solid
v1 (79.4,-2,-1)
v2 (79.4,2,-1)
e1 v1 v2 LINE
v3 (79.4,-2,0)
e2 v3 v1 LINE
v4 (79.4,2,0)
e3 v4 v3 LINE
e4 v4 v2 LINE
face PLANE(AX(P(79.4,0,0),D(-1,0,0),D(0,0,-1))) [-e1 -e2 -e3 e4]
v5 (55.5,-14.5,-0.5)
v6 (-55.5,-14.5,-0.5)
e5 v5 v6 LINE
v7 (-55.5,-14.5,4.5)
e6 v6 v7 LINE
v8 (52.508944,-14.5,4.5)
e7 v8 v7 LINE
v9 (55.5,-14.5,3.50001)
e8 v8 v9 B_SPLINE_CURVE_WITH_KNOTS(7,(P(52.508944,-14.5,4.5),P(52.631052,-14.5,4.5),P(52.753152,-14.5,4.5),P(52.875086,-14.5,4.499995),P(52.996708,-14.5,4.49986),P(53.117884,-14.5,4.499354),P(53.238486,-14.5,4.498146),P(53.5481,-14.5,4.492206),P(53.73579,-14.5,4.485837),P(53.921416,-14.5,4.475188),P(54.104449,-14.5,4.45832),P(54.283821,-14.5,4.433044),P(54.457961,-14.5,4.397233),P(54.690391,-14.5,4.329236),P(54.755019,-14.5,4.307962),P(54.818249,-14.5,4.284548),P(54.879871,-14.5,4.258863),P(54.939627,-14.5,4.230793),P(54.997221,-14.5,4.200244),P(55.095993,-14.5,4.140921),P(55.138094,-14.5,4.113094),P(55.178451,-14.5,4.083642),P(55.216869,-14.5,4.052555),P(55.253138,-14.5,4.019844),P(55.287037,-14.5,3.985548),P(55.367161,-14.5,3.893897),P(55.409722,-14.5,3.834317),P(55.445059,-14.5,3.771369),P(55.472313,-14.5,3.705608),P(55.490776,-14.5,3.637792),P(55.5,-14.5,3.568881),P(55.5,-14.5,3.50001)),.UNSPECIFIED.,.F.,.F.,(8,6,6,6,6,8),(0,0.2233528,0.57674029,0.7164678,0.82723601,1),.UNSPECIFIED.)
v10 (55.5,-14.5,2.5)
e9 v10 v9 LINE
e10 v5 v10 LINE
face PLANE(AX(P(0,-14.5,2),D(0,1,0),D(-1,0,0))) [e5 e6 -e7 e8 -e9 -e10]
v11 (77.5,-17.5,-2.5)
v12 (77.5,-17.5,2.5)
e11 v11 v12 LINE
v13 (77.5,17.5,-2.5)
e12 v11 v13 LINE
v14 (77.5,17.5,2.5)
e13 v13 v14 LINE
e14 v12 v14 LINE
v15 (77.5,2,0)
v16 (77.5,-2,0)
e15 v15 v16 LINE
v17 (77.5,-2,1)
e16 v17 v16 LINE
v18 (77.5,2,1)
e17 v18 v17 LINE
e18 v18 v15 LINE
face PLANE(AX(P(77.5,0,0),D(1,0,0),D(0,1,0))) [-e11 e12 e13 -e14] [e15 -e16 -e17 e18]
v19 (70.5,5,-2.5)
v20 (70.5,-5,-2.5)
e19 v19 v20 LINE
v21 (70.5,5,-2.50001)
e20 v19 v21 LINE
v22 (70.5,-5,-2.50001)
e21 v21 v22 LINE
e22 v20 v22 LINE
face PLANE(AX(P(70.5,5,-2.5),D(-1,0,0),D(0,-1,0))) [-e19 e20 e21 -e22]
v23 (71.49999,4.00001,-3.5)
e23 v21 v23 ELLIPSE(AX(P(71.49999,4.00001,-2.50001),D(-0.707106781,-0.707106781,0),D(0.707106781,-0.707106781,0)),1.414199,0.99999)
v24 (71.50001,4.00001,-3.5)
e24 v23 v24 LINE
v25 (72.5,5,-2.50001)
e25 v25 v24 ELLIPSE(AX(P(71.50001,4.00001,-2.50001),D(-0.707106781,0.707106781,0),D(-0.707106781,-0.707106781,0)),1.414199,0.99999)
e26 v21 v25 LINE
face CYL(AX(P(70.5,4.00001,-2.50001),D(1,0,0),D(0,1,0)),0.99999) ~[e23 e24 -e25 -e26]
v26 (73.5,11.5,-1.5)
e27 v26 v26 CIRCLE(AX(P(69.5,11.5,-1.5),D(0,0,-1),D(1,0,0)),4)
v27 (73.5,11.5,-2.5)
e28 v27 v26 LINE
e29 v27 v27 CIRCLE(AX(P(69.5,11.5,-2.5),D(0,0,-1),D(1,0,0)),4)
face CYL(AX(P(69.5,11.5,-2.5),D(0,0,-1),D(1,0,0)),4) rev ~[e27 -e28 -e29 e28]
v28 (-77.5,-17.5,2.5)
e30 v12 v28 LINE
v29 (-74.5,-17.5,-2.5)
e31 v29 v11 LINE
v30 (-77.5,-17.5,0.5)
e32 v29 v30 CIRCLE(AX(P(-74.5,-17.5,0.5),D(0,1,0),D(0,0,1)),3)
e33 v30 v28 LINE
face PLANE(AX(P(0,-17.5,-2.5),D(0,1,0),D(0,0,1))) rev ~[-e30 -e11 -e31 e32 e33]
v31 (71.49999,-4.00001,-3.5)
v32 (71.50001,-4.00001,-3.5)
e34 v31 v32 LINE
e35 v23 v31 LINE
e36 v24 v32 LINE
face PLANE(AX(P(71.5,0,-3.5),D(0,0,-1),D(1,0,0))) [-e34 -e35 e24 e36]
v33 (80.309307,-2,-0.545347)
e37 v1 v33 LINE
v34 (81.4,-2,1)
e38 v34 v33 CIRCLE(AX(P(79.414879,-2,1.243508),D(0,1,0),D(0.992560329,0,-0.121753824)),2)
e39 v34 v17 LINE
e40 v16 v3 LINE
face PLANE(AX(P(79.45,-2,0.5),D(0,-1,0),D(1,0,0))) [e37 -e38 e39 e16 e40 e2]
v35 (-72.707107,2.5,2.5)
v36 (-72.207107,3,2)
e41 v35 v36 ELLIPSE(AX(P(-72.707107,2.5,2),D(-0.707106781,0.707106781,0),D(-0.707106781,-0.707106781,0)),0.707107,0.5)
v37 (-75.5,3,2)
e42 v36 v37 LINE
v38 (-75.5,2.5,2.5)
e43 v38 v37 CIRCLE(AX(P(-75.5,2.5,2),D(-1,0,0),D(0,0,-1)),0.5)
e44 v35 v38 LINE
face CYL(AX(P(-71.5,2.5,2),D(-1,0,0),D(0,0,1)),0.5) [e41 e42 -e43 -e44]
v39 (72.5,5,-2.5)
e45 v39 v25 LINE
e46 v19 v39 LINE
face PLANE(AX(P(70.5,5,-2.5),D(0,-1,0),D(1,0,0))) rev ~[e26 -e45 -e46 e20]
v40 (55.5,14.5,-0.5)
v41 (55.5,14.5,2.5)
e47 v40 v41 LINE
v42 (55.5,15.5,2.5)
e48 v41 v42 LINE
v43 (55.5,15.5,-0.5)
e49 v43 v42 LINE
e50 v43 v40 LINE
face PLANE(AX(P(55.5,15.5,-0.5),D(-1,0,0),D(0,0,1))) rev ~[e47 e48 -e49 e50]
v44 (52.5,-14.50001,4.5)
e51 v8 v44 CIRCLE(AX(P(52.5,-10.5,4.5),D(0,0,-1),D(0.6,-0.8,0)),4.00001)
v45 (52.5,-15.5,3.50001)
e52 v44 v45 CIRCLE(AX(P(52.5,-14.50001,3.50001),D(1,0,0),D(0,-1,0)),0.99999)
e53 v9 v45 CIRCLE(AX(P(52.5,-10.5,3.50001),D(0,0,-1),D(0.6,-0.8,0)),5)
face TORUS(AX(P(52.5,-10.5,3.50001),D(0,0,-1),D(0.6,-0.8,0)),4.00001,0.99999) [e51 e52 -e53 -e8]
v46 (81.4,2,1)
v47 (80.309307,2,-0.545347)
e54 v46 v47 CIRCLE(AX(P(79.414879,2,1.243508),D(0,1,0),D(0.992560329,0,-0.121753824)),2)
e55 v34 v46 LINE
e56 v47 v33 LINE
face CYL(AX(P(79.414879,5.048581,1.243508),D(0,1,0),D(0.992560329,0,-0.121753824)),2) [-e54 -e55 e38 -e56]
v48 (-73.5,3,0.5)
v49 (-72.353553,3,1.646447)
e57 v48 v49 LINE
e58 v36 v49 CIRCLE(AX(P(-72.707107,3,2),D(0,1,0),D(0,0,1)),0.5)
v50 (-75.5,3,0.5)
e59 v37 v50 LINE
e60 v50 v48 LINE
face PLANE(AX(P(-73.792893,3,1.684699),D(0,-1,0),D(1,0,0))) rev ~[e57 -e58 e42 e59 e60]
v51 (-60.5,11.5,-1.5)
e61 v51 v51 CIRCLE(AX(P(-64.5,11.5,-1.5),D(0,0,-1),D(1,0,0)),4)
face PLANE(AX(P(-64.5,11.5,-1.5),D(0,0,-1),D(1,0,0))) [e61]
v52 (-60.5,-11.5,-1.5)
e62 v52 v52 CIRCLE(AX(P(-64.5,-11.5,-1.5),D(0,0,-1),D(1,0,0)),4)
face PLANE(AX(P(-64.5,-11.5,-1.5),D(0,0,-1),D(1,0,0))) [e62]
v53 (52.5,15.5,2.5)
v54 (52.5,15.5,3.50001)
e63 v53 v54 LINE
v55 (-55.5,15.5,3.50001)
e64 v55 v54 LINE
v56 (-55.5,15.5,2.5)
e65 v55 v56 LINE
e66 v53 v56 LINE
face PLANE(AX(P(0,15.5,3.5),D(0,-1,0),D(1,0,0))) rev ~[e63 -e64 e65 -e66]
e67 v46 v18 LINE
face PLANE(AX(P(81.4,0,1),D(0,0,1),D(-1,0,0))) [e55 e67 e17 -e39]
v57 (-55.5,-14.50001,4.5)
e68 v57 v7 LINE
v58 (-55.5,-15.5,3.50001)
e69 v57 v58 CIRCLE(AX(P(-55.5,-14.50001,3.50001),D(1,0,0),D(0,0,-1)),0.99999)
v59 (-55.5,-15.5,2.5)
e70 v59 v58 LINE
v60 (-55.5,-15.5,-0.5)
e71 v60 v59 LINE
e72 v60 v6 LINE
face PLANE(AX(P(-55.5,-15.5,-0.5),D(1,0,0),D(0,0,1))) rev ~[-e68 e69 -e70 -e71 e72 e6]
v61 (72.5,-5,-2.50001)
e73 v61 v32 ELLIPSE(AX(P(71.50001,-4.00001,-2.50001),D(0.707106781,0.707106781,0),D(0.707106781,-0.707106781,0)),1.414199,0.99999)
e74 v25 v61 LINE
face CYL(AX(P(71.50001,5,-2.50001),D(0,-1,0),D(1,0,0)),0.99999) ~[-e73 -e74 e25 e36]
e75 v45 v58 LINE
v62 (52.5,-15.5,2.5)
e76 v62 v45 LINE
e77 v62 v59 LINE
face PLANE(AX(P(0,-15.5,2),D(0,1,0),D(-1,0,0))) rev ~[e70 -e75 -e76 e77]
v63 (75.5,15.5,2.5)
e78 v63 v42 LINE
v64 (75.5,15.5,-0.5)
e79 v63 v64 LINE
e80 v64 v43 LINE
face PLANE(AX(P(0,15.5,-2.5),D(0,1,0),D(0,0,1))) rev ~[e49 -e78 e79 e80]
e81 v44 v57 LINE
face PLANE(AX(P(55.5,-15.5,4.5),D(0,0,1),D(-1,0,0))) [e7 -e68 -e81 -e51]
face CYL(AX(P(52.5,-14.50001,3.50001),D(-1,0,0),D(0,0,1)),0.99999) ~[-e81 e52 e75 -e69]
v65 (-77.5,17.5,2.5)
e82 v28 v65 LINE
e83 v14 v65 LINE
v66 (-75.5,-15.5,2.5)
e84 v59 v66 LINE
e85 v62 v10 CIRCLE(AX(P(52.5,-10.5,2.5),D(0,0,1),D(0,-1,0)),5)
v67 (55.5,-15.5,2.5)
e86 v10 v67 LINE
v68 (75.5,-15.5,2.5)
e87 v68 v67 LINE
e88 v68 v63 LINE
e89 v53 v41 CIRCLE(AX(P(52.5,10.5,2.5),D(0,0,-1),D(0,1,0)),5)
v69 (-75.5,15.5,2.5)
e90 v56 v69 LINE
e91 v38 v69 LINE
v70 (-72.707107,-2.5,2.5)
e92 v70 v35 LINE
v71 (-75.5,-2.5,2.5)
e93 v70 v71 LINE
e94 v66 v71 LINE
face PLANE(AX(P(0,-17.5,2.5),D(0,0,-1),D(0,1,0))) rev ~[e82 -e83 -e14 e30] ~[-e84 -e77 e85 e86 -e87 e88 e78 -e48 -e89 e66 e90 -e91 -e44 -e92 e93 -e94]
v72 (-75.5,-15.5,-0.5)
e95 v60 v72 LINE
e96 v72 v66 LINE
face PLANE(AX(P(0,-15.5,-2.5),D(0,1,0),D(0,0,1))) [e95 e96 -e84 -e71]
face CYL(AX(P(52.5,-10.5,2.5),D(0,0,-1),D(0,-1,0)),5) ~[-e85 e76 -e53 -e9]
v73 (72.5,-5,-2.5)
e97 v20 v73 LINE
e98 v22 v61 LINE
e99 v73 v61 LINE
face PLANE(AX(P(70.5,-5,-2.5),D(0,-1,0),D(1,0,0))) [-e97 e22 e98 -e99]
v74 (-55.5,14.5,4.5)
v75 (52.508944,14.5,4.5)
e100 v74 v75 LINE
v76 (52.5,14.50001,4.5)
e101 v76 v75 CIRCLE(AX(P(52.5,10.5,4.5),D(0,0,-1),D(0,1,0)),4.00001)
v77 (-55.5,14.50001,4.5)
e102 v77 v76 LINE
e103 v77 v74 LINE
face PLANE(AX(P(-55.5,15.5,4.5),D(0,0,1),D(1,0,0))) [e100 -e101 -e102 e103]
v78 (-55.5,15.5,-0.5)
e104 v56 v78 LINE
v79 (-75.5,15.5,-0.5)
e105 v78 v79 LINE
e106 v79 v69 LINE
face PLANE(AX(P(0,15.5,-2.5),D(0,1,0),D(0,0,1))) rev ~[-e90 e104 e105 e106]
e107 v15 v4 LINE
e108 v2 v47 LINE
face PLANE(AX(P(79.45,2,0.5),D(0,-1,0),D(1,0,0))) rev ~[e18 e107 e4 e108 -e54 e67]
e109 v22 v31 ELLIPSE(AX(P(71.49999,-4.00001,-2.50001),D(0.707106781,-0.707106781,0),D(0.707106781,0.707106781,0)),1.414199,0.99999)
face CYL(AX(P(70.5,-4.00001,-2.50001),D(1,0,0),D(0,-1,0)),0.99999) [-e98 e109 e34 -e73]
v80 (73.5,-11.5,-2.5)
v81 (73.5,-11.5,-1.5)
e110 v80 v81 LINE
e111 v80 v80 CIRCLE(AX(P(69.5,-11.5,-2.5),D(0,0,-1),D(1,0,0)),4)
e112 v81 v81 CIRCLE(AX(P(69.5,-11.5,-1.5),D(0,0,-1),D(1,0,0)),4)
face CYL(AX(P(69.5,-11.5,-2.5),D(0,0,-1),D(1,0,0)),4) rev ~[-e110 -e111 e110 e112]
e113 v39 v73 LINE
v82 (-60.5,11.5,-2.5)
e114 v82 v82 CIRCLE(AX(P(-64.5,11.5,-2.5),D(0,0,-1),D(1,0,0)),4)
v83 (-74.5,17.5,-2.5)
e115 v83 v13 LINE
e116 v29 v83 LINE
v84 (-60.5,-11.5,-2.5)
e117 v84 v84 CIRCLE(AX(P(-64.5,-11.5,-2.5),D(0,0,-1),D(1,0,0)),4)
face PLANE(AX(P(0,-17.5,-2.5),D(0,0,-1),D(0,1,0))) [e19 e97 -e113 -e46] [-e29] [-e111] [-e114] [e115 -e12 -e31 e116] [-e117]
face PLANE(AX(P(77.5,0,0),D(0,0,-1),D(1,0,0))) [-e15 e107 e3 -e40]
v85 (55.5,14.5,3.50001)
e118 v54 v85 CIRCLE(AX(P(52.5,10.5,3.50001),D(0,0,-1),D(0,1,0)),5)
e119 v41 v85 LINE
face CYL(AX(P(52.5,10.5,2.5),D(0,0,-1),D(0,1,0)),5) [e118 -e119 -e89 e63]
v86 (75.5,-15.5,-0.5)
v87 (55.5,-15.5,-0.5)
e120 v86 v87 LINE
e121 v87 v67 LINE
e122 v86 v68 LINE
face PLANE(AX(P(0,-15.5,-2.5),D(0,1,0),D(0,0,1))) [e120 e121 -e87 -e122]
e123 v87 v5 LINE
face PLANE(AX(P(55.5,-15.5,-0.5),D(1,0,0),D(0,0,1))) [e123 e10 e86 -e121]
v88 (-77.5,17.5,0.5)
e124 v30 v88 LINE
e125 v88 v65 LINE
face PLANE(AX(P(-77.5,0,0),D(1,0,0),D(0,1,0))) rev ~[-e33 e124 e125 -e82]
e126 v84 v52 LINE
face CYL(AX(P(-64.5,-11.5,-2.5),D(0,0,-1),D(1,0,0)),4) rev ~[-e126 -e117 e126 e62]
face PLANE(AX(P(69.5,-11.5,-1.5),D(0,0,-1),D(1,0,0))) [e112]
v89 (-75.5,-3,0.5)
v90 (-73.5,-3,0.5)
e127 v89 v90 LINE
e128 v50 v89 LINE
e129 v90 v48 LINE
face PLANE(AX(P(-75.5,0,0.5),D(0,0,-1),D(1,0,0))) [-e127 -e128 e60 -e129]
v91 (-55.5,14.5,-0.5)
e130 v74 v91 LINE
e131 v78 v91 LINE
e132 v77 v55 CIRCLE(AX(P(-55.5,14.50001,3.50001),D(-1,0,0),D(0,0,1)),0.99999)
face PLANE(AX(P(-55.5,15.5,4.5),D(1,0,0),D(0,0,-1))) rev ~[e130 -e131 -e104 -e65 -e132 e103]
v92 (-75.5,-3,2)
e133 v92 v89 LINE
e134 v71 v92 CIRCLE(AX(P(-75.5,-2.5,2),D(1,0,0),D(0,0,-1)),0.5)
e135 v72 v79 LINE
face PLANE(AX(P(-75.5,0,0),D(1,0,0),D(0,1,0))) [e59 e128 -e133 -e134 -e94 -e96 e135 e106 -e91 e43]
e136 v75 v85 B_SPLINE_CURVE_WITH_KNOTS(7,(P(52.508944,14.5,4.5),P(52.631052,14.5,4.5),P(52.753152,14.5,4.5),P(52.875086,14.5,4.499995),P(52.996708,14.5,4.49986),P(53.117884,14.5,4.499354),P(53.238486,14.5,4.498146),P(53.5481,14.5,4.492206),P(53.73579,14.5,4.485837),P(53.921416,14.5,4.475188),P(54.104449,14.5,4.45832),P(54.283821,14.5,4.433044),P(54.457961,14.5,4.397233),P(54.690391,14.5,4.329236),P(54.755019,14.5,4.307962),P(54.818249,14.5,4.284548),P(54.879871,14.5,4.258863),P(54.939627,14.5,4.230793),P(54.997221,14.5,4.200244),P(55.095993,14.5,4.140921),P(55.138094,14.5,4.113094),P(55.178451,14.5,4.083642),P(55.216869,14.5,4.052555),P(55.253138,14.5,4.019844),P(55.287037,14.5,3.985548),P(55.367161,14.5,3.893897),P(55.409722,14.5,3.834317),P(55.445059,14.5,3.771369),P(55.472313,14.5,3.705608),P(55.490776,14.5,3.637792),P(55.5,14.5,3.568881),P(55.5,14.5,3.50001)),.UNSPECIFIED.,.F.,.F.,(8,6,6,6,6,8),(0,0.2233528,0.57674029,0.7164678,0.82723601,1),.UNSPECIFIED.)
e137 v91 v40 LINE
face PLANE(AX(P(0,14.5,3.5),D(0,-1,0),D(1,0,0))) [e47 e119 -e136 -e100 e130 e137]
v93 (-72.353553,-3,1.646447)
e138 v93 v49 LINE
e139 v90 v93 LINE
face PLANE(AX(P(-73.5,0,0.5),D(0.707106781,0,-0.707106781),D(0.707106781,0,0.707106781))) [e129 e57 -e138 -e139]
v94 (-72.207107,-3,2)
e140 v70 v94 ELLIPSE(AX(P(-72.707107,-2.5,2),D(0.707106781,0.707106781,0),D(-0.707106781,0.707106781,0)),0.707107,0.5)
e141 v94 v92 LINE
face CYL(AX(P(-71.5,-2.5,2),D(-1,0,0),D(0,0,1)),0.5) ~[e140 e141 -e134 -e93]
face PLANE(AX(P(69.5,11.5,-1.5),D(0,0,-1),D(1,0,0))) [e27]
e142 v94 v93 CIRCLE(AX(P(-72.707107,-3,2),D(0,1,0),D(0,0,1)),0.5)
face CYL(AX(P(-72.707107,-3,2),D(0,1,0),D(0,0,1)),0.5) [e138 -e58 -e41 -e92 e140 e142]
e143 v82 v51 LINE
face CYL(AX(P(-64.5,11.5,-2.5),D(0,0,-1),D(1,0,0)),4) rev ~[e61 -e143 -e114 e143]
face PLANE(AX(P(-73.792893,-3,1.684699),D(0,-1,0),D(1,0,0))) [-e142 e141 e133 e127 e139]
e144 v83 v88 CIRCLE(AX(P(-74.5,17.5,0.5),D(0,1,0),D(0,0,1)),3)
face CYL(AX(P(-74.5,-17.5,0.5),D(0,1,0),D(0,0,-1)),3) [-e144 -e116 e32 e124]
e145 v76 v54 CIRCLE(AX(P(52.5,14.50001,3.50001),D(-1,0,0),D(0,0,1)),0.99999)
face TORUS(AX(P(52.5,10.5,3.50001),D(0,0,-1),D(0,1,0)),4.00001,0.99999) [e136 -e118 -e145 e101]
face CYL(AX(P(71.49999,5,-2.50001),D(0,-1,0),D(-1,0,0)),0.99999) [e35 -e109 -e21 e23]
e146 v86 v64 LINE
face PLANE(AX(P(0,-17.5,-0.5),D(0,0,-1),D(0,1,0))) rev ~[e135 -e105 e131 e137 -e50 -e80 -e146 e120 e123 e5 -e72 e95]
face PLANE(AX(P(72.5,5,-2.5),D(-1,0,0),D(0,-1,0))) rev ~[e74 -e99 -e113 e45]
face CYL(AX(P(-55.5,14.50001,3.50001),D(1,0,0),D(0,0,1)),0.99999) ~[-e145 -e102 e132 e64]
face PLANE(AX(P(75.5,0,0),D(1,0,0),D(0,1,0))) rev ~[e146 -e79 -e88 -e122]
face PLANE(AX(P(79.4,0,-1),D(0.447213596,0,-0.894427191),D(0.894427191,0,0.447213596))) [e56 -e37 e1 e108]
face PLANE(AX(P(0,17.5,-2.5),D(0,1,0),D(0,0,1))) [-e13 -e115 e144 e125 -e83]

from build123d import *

# Parameters (mm, degrees)
F0_W         = 35
F0_H         = 5
F1_DEPTH     = 77.5
F2_T         = -2
F4_DEPTH     = 3
F6_DEPTH     = 2
F7_T1_DEPTH  = 10.0971618345
F8_W         = 111
F8_H         = 5
F9_DEPTH     = 1
F10_W        = 111
F10_H        = 2
F10_H_2      = 3
F11_DEPTH    = 1
F12_T1_DEPTH = 9.5
F13_R        = 0.99999
F14_R        = 0.5
F15_R        = 4
F16_DEPTH    = 1
F17_W        = 2
F17_H        = 10
F18_DEPTH    = 1
F19_R        = 0.99999
F20_R        = 3


# Not quite as in the source:
# - a fillet or chamfer that OpenCascade refuses, or shapes differently, is made with other operations: its cross-section is extruded or revolved along the edge and cut away or added
# - a fillet or chamfer is up to 0.001 mm smaller than in the source, because OpenCascade refuses the exact size


with BuildPart() as f1:
    # F0 (on Right) → F1 (new body, symmetric)
    with BuildSketch(Plane.YZ):
        Rectangle(F0_W, F0_H)
    extrude(amount=F1_DEPTH, both=True)

    # F2
    f2_openings = [f1.faces().sort_by_distance(p)[0] for p in [
        (0, 0, 2.5),
    ]]
    offset(amount=F2_T, openings=f2_openings)

    # F3 (on Front) → F4 (join, symmetric)
    with BuildSketch(Plane.XZ):
        Polygon((-71.5, 2.5), (-75.5, 2.5), (-75.5, 0.5), (-73.5, 0.5), align=None)
    extrude(amount=F4_DEPTH, both=True)

    # F5 (on Front) → F6 (join, symmetric)
    with BuildSketch(Plane.XZ):
        Polygon((81.4, 1), (77.5, 1), (77.5, 0), (79.4, 0), (81.4, 0), align=None)
        Polygon((79.4, -1), (81.4, 0), (79.4, 0), align=None)
    extrude(amount=F6_DEPTH, both=True)

    # F7: fillet of radius 2 on 1 edges, made by hand

    # F7_s2 → F7_t1 (cut)
    with BuildSketch(Plane.XZ.offset(-5.0485809173)):
        with BuildLine():
            ThreePointArc((81.4, 1), (81.0488845703, 0.09023972), (80.3093065335, -0.5453467333))
            Line((80.3093065335, -0.5453467333), (81.4, 0))
            Line((81.4, 0), (81.4, 1))
        make_face()
    extrude(amount=F7_T1_DEPTH, mode=Mode.SUBTRACT)

    # F8 (on face) → F9 (join)
    with BuildSketch(Plane(origin=(0, -15.5, 0), x_dir=(-1, 0, 0), z_dir=(0, 1, 0))):
        with Locations((0, 2)):
            Rectangle(F8_W, F8_H)
    extrude(amount=F9_DEPTH)

    # F10 (on face) → F11 (join)
    with BuildSketch(Plane.XZ.offset(-15.5)):
        with Locations((0, 3.5)):
            Rectangle(F10_W, F10_H)
        with Locations((0, 1)):
            Rectangle(F10_W, F10_H_2)
    extrude(amount=F11_DEPTH)

    # F12: fillet of radius 5 on 2 edges, made by hand

    # F12_s2 → F12_t1 (cut)
    with BuildSketch(Plane.XY.offset(2.5)):
        with BuildLine():
            ThreePointArc((52.5, 15.5), (54.0811388301, 15.2434164903), (55.5, 14.5))
            Line((55.5, 14.5), (55.5, 15.5))
            Line((55.5, 15.5), (52.5, 15.5))
        make_face()
        with BuildLine():
            ThreePointArc((52.5, -15.5), (54.0811388301, -15.2434164903), (55.5, -14.5))
            Line((55.5, -14.5), (55.5, -15.5))
            Line((55.5, -15.5), (52.5, -15.5))
        make_face()
    extrude(amount=F12_T1_DEPTH, mode=Mode.SUBTRACT)

    # F13 (radius 1 in the source; OpenCascade refuses exactly that, so slightly less here)
    f13_edges = [f1.edges().sort_by_distance(p)[0] for p in [
        (-1.5, -15.5, 4.5),
        (-1.5, 15.5, 4.5),
    ]]
    fillet(f13_edges, radius=F13_R)

    # F14
    f14_edges = [f1.edges().sort_by_distance(p)[0] for p in [
        (-71.5, 0, 2.5),
        (-73.5, -3, 2.5),
        (-73.5, 3, 2.5),
    ]]
    fillet(f14_edges, radius=F14_R)

    # F15 (on face) → F16 (cut)
    with BuildSketch(Plane(origin=(0, 0, -2.5), x_dir=(1, 0, 0), z_dir=(0, 0, -1))):
        with Locations((-64.5, 11.5)):
            Circle(F15_R)
        with Locations((-64.5, -11.5)):
            Circle(F15_R)
        with Locations((69.5, -11.5)):
            Circle(F15_R)
        with Locations((69.5, 11.5)):
            Circle(F15_R)
    extrude(amount=-F16_DEPTH, mode=Mode.SUBTRACT)

    # F17 (on face) → F18 (join)
    with BuildSketch(Plane(origin=(0, 0, -2.5), x_dir=(1, 0, 0), z_dir=(0, 0, -1))):
        with Locations((71.5, 0)):
            Rectangle(F17_W, F17_H)
    extrude(amount=F18_DEPTH)

    # F19 (radius 1 in the source; OpenCascade refuses exactly that, so slightly less here)
    f19_edges = [f1.edges().sort_by_distance(p)[0] for p in [
        (71.5, -5, -3.5),
        (72.5, 0, -3.5),
        (71.5, 5, -3.5),
        (70.5, 0, -3.5),
    ]]
    fillet(f19_edges, radius=F19_R)

    # F20
    f20_edges = [f1.edges().sort_by_distance(p)[0] for p in [
        (-77.5, 0, -2.5),
    ]]
    fillet(f20_edges, radius=F20_R)


solid = f1.part
